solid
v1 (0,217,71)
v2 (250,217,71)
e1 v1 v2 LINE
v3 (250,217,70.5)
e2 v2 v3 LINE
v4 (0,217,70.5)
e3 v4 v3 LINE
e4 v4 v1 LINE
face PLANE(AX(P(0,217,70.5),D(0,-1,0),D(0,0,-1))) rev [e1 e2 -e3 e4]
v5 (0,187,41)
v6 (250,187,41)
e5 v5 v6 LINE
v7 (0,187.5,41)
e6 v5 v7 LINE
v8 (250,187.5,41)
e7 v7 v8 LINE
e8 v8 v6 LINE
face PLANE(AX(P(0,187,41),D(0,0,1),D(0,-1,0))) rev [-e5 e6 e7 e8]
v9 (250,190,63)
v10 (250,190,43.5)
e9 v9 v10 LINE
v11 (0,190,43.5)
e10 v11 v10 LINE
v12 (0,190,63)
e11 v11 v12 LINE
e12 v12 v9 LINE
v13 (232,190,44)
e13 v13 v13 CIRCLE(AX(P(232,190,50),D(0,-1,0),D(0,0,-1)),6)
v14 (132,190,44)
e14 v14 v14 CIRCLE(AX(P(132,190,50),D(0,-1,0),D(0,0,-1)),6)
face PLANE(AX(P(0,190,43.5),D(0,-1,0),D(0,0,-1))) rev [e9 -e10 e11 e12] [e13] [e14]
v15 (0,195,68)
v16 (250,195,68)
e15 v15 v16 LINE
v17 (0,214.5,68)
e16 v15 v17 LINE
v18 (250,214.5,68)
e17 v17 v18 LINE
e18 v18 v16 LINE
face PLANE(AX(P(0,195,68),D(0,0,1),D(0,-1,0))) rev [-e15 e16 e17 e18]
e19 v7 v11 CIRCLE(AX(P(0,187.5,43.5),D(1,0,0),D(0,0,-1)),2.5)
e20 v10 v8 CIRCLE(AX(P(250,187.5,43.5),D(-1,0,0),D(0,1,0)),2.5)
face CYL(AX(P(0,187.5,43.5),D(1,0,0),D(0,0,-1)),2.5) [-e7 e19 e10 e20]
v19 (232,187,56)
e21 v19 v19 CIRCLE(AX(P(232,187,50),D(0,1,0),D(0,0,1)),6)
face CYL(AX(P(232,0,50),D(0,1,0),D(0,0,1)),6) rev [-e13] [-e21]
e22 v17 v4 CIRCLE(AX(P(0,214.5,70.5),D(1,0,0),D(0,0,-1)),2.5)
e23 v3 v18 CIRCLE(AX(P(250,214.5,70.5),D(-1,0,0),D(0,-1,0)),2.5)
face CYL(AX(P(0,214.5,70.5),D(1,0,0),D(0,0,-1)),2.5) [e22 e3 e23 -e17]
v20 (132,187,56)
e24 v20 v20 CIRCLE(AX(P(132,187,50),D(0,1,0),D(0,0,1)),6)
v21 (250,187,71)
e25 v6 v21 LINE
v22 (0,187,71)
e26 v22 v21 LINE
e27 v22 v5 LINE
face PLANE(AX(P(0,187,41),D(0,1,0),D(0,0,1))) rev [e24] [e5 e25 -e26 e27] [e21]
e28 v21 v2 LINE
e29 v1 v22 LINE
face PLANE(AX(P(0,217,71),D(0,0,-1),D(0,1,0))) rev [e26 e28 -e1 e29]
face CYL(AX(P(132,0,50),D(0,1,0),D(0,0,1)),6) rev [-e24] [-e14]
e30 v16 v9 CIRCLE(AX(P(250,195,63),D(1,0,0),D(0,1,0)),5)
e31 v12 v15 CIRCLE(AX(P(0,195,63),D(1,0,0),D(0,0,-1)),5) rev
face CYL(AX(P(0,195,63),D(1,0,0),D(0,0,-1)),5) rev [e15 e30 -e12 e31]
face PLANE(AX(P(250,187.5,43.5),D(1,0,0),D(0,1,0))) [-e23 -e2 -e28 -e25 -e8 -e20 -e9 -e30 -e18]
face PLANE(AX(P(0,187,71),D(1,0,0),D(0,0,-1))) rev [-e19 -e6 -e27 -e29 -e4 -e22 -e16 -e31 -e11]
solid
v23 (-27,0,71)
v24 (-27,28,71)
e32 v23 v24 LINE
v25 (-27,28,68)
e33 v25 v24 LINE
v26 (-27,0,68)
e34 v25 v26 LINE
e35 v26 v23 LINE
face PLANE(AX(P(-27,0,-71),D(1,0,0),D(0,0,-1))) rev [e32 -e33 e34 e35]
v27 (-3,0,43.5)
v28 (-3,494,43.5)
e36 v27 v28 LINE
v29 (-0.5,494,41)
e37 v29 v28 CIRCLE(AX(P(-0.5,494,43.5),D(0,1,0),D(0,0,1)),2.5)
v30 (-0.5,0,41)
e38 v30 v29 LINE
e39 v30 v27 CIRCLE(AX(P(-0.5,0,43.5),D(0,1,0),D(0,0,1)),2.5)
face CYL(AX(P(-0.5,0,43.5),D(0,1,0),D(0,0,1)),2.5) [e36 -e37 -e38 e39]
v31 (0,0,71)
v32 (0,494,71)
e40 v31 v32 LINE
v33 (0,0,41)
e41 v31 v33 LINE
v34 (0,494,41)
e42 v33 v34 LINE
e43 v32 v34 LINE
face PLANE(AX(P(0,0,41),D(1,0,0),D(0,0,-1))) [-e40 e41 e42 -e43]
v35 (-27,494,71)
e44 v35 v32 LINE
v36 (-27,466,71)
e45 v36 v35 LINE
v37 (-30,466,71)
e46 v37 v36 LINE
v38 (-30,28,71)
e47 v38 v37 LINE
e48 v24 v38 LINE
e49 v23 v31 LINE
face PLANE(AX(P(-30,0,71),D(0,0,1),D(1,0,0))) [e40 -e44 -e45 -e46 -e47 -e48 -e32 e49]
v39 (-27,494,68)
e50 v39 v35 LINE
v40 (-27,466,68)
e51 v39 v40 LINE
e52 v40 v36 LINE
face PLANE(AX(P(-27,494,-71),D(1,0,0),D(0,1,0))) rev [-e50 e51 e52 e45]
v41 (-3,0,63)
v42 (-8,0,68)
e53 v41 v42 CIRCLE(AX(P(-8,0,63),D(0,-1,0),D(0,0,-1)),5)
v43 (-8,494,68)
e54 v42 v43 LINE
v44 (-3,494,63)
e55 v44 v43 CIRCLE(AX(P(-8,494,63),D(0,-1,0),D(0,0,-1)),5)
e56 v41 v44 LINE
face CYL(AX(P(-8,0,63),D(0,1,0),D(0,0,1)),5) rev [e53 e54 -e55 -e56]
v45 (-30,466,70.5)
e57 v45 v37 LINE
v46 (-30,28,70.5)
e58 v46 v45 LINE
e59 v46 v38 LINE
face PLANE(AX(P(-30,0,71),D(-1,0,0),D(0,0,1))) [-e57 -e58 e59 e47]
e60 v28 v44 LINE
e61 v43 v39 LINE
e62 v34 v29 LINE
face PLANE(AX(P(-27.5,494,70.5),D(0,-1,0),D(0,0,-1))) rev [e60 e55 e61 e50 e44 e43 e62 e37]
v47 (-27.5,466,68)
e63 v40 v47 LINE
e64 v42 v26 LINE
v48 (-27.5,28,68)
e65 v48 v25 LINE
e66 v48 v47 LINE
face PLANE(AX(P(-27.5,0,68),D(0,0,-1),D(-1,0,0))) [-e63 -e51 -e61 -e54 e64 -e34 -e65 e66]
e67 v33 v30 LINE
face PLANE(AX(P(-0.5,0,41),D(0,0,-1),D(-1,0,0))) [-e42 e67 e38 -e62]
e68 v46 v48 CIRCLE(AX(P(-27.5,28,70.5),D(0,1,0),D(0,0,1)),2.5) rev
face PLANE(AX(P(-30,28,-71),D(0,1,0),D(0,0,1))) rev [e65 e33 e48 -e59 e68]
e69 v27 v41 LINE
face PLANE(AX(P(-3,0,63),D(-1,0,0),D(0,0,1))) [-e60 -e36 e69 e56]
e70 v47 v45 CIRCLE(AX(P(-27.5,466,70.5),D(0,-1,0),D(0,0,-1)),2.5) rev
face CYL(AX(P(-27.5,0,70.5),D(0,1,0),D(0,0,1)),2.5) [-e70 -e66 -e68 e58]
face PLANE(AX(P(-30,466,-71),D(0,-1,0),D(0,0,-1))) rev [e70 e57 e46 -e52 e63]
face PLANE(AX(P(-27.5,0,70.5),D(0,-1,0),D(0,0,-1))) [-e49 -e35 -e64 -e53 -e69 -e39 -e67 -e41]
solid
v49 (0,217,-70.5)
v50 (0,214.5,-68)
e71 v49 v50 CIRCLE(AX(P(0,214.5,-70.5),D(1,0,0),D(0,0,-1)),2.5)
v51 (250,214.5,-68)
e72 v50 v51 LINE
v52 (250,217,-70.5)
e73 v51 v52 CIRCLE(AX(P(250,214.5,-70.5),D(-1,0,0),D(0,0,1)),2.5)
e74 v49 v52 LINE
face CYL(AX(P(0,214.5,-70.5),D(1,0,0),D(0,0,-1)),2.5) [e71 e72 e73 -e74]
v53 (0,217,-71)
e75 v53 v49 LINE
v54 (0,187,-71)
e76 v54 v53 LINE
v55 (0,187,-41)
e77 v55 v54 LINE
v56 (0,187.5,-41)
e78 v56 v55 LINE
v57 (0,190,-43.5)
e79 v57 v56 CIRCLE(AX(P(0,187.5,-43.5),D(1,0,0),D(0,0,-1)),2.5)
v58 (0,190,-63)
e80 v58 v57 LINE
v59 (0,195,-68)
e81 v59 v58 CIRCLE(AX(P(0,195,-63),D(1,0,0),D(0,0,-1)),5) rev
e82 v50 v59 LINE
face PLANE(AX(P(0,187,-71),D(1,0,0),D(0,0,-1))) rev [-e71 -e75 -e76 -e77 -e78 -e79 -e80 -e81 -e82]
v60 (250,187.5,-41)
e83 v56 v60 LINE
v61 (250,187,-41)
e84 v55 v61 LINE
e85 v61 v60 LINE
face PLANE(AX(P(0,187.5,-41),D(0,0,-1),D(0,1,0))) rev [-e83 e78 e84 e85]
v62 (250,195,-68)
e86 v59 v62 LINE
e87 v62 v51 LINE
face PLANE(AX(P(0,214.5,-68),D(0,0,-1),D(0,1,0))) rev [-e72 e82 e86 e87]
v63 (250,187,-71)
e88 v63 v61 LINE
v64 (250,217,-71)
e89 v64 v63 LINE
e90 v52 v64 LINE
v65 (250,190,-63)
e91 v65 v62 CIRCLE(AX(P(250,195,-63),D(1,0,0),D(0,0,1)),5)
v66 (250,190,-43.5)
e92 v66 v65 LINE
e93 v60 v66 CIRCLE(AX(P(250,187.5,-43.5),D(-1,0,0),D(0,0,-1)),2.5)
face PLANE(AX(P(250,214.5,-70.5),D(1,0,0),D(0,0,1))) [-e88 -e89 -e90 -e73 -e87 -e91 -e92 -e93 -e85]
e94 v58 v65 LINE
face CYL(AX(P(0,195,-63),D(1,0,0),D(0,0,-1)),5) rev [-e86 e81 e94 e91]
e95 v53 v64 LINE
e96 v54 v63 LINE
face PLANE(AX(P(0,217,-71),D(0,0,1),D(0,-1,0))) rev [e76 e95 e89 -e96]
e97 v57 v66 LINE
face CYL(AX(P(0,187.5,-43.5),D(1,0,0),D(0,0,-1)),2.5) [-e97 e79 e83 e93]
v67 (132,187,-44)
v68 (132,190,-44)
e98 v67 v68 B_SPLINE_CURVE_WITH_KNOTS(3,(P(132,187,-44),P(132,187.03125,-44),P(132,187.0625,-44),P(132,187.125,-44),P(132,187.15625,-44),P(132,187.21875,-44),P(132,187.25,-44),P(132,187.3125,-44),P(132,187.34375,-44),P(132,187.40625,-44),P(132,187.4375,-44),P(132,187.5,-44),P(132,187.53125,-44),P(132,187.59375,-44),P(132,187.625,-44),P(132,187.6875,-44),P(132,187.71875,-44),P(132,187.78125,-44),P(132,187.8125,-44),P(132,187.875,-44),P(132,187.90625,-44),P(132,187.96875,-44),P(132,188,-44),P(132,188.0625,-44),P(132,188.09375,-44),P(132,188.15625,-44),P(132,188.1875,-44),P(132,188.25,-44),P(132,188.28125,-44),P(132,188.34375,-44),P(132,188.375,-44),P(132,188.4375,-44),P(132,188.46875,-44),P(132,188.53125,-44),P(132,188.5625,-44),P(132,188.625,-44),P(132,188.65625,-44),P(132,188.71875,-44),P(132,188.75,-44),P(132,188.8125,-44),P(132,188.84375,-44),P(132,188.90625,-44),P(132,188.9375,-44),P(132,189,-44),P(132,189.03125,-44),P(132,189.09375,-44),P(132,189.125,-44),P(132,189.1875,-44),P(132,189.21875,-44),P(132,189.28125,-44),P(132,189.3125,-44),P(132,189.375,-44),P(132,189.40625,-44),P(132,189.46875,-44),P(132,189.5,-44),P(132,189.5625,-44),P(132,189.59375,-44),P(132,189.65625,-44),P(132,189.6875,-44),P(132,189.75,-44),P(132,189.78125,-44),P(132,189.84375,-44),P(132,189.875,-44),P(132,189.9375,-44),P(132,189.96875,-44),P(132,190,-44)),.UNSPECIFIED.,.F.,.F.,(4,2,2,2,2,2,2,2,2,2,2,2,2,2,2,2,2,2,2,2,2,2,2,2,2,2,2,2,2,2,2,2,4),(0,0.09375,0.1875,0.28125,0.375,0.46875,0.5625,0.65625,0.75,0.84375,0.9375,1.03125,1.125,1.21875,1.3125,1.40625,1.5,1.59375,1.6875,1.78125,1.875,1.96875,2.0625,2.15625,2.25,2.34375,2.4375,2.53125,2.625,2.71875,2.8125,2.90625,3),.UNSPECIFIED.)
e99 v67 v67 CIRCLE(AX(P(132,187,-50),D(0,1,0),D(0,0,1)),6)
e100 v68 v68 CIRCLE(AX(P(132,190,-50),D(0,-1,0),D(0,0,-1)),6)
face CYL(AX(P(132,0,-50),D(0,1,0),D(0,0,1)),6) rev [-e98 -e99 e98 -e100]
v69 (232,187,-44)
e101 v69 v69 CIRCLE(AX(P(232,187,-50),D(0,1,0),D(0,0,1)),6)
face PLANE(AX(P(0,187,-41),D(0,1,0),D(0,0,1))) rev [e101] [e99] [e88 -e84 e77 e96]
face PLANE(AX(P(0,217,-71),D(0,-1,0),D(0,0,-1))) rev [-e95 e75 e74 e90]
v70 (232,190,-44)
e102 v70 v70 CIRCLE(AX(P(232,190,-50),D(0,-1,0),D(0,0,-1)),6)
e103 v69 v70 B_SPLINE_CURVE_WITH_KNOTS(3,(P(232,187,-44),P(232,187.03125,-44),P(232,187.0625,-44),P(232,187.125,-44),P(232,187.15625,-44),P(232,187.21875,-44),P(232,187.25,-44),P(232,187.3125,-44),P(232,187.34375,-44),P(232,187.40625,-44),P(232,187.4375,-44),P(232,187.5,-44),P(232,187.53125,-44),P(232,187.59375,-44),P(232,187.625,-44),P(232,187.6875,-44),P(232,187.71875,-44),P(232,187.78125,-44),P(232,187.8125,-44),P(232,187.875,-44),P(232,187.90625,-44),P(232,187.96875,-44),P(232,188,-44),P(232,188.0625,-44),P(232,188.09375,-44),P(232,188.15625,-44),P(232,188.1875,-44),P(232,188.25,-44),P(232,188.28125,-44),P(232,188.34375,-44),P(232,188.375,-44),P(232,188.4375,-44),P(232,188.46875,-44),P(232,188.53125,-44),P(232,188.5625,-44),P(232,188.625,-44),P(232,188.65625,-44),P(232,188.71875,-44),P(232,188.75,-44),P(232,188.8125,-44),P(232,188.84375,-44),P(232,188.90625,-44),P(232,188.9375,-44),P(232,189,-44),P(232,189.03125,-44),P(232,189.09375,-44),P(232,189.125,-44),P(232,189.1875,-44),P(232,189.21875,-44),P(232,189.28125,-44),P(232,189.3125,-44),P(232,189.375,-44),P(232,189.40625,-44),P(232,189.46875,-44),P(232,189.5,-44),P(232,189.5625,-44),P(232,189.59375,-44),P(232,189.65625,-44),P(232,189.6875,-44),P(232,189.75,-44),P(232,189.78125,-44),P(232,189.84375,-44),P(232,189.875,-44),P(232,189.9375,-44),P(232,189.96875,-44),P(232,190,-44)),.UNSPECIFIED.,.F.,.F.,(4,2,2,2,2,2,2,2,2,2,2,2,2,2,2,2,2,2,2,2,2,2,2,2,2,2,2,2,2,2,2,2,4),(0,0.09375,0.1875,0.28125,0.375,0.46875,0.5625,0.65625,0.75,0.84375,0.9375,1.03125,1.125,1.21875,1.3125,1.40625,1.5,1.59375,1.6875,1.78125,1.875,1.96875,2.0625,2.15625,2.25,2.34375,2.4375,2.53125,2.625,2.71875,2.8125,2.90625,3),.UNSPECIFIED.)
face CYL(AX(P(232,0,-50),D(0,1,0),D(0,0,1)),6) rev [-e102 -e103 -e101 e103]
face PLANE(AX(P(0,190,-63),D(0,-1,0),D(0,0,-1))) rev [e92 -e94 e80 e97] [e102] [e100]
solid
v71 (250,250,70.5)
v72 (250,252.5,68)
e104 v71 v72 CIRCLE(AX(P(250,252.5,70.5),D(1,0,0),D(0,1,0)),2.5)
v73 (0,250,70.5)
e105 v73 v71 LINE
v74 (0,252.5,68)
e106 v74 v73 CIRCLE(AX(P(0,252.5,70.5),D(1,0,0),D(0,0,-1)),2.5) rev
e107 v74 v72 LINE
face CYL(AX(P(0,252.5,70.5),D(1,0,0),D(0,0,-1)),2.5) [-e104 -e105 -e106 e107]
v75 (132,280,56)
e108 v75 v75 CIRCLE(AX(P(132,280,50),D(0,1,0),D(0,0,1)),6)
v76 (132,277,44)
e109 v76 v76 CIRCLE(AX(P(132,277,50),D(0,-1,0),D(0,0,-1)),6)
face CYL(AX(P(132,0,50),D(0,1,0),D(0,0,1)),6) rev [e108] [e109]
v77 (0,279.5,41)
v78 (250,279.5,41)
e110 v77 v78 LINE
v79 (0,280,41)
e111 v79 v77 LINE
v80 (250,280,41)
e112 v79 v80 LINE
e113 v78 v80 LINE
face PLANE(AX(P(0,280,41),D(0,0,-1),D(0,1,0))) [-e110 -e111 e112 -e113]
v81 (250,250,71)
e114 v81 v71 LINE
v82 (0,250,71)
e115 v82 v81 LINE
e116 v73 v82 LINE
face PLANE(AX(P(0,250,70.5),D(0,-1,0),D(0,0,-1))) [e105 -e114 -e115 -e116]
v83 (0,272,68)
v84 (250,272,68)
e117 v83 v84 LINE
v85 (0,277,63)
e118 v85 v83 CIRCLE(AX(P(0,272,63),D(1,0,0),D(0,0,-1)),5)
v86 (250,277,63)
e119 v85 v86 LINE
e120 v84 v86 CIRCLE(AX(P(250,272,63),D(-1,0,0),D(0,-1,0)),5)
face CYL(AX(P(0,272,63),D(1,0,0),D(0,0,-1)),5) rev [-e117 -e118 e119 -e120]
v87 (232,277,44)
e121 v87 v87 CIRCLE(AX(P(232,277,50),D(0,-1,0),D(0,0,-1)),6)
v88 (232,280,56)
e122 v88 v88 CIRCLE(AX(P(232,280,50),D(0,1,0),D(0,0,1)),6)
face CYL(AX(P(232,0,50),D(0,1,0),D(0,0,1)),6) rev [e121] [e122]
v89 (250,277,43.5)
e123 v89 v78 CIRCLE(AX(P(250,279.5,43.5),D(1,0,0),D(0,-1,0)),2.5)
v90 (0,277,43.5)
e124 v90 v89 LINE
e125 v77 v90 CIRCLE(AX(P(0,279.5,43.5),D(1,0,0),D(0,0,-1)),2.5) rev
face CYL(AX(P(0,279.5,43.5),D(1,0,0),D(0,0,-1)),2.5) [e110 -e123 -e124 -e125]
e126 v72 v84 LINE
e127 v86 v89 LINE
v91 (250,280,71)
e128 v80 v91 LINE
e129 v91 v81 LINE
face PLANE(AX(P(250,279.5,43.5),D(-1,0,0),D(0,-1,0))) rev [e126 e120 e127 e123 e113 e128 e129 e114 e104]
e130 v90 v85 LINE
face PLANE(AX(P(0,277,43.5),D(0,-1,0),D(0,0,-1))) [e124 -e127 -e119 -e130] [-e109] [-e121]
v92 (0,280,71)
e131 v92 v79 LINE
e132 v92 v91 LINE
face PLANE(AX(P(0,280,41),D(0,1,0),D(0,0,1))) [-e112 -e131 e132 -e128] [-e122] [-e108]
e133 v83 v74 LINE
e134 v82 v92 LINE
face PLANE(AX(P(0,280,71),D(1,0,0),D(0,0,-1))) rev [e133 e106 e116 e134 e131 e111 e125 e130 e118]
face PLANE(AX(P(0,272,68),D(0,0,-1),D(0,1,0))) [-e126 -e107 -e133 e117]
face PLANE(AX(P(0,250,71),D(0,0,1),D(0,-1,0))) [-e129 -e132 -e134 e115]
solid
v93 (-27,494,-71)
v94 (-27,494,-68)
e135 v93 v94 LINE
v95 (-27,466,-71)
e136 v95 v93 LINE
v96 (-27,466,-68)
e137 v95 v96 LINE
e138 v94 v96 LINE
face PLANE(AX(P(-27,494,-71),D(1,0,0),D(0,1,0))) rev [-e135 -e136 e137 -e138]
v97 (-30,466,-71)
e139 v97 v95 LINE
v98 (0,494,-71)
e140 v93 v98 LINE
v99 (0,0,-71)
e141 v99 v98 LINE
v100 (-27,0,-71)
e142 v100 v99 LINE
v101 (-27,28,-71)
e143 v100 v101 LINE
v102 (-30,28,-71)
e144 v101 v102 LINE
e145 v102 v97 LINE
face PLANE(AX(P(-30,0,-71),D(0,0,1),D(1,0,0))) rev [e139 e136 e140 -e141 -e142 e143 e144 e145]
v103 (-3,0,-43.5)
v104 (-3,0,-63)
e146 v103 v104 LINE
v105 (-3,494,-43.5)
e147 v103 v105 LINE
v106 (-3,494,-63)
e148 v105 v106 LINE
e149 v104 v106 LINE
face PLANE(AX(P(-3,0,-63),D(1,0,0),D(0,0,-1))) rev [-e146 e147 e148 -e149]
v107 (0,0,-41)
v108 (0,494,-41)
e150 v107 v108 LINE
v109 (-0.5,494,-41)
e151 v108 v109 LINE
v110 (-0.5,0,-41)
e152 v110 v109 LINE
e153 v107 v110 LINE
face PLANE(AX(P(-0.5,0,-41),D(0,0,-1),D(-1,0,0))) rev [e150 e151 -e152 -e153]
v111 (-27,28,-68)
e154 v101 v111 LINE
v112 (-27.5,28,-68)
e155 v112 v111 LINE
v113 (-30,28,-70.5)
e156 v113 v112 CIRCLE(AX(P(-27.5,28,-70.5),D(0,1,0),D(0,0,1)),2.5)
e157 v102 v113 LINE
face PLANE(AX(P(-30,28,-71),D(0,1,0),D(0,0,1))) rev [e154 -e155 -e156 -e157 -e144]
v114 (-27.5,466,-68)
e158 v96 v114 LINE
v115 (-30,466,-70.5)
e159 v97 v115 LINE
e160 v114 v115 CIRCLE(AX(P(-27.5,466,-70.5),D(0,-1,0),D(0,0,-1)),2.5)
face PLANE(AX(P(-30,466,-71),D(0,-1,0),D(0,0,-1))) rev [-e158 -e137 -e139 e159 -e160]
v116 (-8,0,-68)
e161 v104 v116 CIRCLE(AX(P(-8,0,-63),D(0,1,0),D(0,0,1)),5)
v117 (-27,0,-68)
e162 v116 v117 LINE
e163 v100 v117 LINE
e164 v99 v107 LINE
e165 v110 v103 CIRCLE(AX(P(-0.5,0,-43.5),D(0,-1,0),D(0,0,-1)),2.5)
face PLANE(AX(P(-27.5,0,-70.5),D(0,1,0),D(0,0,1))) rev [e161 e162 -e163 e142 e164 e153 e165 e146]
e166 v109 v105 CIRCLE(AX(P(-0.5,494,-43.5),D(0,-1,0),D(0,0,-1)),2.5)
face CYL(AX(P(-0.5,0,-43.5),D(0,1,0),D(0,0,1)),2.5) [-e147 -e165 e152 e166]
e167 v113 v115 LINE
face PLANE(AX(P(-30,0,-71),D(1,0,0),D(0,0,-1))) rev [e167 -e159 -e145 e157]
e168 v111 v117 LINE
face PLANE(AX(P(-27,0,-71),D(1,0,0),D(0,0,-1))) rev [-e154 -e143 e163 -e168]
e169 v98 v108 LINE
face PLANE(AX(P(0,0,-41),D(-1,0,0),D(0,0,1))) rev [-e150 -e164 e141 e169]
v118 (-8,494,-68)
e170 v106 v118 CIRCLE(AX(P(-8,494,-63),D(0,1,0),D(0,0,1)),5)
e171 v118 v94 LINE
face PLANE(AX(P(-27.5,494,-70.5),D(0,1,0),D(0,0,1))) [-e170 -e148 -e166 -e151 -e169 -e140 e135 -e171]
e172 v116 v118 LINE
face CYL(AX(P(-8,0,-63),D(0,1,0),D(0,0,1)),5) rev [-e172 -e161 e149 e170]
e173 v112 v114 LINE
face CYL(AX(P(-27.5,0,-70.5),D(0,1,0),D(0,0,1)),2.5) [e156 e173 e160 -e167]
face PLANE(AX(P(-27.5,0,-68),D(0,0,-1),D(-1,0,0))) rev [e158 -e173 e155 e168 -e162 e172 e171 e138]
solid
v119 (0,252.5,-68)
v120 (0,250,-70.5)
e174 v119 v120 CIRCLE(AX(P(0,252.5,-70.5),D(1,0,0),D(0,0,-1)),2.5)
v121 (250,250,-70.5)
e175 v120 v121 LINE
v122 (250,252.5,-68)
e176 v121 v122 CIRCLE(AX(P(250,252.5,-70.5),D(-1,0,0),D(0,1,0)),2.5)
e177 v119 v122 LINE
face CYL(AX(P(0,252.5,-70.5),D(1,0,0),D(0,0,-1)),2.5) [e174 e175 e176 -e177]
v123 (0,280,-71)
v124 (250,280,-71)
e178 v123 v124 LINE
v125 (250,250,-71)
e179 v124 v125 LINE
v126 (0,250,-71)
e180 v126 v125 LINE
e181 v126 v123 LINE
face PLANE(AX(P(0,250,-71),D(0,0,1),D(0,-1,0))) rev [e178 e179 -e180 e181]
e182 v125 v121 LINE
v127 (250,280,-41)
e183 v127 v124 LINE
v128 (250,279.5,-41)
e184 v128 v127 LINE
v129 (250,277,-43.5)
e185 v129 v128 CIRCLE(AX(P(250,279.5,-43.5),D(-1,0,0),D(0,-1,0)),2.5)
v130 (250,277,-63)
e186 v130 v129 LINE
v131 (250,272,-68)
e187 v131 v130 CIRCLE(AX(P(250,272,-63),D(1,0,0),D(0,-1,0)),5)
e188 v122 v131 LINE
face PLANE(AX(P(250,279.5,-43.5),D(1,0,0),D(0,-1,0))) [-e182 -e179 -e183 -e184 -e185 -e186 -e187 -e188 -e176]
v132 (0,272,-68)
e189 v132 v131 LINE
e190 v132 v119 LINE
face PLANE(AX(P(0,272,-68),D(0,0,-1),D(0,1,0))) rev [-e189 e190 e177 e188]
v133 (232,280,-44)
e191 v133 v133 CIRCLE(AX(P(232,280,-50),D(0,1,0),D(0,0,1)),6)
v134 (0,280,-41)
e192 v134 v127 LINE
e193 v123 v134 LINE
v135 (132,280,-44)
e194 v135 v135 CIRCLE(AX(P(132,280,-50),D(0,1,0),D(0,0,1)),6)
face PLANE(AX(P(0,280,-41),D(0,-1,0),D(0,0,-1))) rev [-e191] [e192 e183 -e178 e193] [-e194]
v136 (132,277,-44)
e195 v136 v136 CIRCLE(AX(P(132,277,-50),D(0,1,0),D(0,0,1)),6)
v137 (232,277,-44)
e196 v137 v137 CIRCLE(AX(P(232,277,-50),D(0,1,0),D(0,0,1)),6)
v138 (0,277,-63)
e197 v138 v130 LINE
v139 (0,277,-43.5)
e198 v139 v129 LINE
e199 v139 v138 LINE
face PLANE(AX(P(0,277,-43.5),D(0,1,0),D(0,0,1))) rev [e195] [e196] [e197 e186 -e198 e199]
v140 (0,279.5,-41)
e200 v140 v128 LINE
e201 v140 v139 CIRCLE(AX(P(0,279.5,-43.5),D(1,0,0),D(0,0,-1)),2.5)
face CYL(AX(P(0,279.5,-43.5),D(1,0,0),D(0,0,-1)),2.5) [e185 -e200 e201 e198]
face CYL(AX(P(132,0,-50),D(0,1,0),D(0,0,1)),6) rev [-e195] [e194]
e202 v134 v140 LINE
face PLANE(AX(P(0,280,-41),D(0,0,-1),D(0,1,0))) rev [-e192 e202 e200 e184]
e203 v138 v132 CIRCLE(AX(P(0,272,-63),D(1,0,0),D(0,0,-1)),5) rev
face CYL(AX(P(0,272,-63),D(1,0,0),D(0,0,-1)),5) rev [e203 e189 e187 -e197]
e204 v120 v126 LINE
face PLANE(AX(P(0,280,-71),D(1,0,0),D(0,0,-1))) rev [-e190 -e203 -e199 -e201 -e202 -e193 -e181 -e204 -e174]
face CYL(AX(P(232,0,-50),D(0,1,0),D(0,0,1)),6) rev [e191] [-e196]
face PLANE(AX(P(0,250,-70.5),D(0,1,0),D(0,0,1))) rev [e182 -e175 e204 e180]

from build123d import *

# Parameters (mm, degrees)
STRUCTURE_SYSTEM1_DEPTH   = 494
STRUCTURE_SYSTEM1_2_DEPTH = 250
CUT_EXTRUDE1_DEPTH        = 572.576766498
CUT_EXTRUDE1_DEPTH_BACK   = 572.576766498
SKETCH2_W                 = 3
SKETCH2_H                 = 28
SKETCH3_R                 = 6
CUT_EXTRUDE2_DEPTH        = 383.022250661


# Read off the part's stored shape, not the designer's step: Structure System1
with BuildPart() as part:
    # Structure System1 outline → Structure System1 (new body)
    with BuildSketch(Plane(origin=(0, 0, 0), x_dir=(1, 0, 0), z_dir=(0, 1, 0))):
        with BuildLine():
            Line((0, 41), (0, 71))
            Line((0, 71), (-30, 71))
            Line((-30, 71), (-30, 70.5))
            ThreePointArc((-30, 70.5), (-29.267766953, 68.732233047), (-27.5, 68))
            Line((-27.5, 68), (-8, 68))
            ThreePointArc((-8, 68), (-4.464466094, 66.535533906), (-3, 63))
            Line((-3, 63), (-3, 43.5))
            ThreePointArc((-3, 43.5), (-2.267766953, 41.732233047), (-0.5, 41))
            Line((-0.5, 41), (0, 41))
        make_face()
        with BuildLine():
            Line((-30, -71), (0, -71))
            Line((0, -71), (0, -41))
            Line((0, -41), (-0.5, -41))
            ThreePointArc((-0.5, -41), (-2.267766953, -41.732233047), (-3, -43.5))
            Line((-3, -43.5), (-3, -63))
            ThreePointArc((-3, -63), (-4.464466094, -66.535533906), (-8, -68))
            Line((-8, -68), (-27.5, -68))
            ThreePointArc((-27.5, -68), (-29.267766953, -68.732233047), (-30, -70.5))
            Line((-30, -70.5), (-30, -71))
        make_face()
    extrude(amount=STRUCTURE_SYSTEM1_DEPTH)

    # Sketch2 → Cut-Extrude1 (cut, two sides: drawn at the far end of the back side and taken through both)
    with BuildSketch(Plane.XY.offset(71).offset(-CUT_EXTRUDE1_DEPTH_BACK)):
        with Locations((-28.5, 14)):
            Rectangle(SKETCH2_W, SKETCH2_H)
        with Locations((-28.5, 480)):
            Rectangle(SKETCH2_W, SKETCH2_H)
    extrude(amount=CUT_EXTRUDE1_DEPTH + CUT_EXTRUDE1_DEPTH_BACK, mode=Mode.SUBTRACT)


with BuildPart() as body_2:
    # Structure System1 2 outline → Structure System1 2 (new body)
    with BuildSketch(Plane.YZ):
        with BuildLine():
            Line((187, -41), (187, -71))
            Line((187, -71), (217, -71))
            Line((217, -71), (217, -70.5))
            ThreePointArc((217, -70.5), (216.267766953, -68.732233047), (214.5, -68))
            Line((214.5, -68), (195, -68))
            ThreePointArc((195, -68), (191.464466094, -66.535533906), (190, -63))
            Line((190, -63), (190, -43.5))
            ThreePointArc((190, -43.5), (189.267766953, -41.732233047), (187.5, -41))
            Line((187.5, -41), (187, -41))
        make_face()
        with BuildLine():
            Line((250, -71), (280, -71))
            Line((280, -71), (280, -41))
            Line((280, -41), (279.5, -41))
            ThreePointArc((279.5, -41), (277.732233047, -41.732233047), (277, -43.5))
            Line((277, -43.5), (277, -63))
            ThreePointArc((277, -63), (275.535533906, -66.535533906), (272, -68))
            Line((272, -68), (252.5, -68))
            ThreePointArc((252.5, -68), (250.732233047, -68.732233047), (250, -70.5))
            Line((250, -70.5), (250, -71))
        make_face()
        with BuildLine():
            Line((280, 41), (280, 71))
            Line((280, 71), (250, 71))
            Line((250, 71), (250, 70.5))
            ThreePointArc((250, 70.5), (250.732233047, 68.732233047), (252.5, 68))
            Line((252.5, 68), (272, 68))
            ThreePointArc((272, 68), (275.535533906, 66.535533906), (277, 63))
            Line((277, 63), (277, 43.5))
            ThreePointArc((277, 43.5), (277.732233047, 41.732233047), (279.5, 41))
            Line((279.5, 41), (280, 41))
        make_face()
        with BuildLine():
            Line((217, 71), (187, 71))
            Line((187, 71), (187, 41))
            Line((187, 41), (187.5, 41))
            ThreePointArc((187.5, 41), (189.267766953, 41.732233047), (190, 43.5))
            Line((190, 43.5), (190, 63))
            ThreePointArc((190, 63), (191.464466094, 66.535533906), (195, 68))
            Line((195, 68), (214.5, 68))
            ThreePointArc((214.5, 68), (216.267766953, 68.732233047), (217, 70.5))
            Line((217, 70.5), (217, 71))
        make_face()
    extrude(amount=STRUCTURE_SYSTEM1_2_DEPTH)

    # Sketch3 → Cut-Extrude2 (cut, through all)
    with BuildSketch(Plane(origin=(0, 280, 0), x_dir=(1, 0, 0), z_dir=(0, 1, 0))):
        with Locations(Location((232, 50, 0), (0, 0, 270))):
            Circle(SKETCH3_R)
        with Locations(Location((232, -50, 0), (0, 0, 270))):
            Circle(SKETCH3_R)
        with Locations(Location((132, -50, 0), (0, 0, 270))):
            Circle(SKETCH3_R)
        with Locations(Location((132, 50, 0), (0, 0, 270))):
            Circle(SKETCH3_R)
    extrude(amount=-CUT_EXTRUDE2_DEPTH, mode=Mode.SUBTRACT)


solid = Compound([part.part, body_2.part])
